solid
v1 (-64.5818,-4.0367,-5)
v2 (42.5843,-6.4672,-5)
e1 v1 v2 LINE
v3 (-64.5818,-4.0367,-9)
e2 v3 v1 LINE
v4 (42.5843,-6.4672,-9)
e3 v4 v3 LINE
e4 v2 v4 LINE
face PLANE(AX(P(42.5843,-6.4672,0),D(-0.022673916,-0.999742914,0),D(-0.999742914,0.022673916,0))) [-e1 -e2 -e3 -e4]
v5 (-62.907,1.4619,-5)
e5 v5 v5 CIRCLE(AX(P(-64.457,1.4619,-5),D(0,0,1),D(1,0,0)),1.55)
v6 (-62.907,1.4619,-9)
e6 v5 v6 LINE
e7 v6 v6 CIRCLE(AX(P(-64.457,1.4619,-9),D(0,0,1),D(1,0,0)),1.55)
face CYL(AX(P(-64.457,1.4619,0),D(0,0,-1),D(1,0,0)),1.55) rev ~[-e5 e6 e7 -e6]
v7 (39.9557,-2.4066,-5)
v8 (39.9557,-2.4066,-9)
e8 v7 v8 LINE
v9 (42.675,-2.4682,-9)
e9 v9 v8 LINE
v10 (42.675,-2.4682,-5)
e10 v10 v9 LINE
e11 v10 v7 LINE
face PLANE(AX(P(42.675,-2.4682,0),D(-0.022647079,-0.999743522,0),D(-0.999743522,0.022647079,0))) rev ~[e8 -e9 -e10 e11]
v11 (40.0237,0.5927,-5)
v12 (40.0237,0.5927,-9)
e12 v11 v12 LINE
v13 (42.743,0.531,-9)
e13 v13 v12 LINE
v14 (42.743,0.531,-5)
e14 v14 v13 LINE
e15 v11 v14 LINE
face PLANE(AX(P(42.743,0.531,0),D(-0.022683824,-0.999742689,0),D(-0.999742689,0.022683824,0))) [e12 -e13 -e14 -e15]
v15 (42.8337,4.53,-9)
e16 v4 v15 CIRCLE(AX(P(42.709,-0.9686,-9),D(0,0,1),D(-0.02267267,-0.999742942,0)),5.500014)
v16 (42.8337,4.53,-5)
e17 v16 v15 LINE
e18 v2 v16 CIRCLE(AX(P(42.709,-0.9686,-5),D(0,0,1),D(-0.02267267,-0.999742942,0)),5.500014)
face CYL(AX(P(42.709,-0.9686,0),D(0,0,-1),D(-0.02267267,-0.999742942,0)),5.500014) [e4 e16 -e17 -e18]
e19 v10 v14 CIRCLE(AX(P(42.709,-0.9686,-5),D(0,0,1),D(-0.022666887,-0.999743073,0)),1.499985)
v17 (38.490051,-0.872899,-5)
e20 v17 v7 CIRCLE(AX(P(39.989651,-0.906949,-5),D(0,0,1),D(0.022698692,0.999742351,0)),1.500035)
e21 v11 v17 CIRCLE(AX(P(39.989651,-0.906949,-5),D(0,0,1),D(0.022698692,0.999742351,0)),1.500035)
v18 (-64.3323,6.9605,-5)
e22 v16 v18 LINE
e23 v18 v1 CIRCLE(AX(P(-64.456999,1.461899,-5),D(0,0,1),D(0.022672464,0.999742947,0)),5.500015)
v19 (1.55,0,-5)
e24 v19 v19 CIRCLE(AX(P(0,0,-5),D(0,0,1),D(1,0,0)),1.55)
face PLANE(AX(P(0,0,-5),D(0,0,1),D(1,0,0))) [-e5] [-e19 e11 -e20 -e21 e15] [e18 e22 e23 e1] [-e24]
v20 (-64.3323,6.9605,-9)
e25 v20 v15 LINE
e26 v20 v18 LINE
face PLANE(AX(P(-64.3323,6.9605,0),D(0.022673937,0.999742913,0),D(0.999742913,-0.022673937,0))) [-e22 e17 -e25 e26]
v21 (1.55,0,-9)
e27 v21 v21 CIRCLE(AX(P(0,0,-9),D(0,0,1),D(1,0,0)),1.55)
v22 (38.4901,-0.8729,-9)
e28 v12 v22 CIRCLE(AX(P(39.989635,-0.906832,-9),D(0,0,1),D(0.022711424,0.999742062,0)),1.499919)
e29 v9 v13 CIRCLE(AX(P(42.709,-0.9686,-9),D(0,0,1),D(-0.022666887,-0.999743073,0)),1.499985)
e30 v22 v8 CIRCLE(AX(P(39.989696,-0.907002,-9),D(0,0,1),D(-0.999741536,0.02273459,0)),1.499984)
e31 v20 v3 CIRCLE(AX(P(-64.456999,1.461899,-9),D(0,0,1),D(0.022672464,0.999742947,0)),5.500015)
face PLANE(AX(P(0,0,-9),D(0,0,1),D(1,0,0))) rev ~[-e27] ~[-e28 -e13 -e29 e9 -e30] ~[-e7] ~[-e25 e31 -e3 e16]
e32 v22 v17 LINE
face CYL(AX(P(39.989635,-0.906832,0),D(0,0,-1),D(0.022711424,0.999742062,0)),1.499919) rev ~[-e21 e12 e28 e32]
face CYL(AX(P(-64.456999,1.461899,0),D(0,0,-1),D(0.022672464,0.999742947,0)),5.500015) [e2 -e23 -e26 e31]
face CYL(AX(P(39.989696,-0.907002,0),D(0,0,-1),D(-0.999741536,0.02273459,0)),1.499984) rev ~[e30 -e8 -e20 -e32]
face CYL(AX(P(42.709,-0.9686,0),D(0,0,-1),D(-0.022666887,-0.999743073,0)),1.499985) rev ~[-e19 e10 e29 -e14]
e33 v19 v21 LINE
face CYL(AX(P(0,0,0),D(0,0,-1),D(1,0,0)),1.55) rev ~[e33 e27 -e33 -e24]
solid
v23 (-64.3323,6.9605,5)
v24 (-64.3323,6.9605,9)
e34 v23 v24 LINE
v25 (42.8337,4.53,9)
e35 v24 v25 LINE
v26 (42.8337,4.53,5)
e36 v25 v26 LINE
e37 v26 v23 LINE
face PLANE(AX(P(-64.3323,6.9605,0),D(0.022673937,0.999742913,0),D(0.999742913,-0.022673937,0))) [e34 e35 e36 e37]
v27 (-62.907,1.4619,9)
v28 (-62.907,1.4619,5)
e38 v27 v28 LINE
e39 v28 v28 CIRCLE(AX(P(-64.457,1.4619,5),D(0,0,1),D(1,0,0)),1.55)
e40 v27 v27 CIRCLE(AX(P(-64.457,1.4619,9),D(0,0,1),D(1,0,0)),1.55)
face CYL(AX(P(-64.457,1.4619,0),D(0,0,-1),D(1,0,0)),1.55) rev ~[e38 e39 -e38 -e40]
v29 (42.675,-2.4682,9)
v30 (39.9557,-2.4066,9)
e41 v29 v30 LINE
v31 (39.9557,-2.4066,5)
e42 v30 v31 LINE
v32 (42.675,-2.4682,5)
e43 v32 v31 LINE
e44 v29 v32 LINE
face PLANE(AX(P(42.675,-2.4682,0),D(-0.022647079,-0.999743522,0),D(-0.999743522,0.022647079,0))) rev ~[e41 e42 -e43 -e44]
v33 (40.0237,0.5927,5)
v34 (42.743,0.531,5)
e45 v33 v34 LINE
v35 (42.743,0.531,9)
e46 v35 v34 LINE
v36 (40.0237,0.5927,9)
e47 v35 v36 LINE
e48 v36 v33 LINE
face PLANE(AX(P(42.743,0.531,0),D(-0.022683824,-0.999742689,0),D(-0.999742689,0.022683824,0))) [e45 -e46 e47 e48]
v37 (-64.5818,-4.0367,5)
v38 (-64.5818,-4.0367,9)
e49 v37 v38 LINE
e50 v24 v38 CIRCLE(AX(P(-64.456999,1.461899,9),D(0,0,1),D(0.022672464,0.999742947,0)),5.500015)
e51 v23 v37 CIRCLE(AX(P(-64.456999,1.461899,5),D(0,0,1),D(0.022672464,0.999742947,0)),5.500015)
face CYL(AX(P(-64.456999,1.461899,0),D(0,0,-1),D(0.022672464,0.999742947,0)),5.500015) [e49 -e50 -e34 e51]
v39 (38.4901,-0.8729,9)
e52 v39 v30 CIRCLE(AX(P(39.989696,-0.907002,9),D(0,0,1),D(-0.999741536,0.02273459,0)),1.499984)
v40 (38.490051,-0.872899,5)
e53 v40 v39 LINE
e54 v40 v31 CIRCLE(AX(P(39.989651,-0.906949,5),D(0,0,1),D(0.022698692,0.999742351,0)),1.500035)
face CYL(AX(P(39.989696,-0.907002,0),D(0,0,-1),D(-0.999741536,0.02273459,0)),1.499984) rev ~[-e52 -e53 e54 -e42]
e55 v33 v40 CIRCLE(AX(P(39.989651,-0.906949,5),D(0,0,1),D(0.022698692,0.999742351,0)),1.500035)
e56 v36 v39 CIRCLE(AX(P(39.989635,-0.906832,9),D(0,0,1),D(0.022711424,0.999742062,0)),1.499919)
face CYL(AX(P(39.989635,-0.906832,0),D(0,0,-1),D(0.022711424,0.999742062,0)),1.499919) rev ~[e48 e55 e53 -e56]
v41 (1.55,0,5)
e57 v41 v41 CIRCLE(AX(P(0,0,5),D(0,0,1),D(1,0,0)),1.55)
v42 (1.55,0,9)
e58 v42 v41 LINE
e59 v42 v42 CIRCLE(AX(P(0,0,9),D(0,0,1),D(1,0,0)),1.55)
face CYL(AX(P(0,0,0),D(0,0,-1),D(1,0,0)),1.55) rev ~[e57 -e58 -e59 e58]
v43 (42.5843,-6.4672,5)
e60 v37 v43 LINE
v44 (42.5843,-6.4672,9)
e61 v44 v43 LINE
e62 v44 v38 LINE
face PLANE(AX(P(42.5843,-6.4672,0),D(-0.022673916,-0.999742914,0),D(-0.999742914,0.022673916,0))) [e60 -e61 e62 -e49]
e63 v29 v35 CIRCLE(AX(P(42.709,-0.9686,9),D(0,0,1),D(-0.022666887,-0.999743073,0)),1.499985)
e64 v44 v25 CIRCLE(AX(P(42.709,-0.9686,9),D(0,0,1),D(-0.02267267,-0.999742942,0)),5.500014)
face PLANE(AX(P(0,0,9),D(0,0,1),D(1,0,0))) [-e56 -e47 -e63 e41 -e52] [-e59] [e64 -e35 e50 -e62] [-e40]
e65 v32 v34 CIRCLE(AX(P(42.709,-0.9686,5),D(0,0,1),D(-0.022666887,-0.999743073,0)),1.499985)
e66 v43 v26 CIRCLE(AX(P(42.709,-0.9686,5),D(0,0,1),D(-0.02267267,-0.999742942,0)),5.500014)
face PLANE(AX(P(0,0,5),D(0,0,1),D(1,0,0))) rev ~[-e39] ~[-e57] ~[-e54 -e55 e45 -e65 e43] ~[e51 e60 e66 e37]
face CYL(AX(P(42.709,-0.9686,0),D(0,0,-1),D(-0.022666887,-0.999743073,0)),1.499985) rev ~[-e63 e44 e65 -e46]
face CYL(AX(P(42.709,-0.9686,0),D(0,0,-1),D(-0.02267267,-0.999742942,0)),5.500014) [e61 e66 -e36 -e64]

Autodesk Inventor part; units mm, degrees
ref_plane "YZ Plane" through (0, 0, 0) normal (1, 0, 0) x (0, 1, 0)
ref_plane "XZ Plane" through (0, 0, 0) normal (0, 1, 0) x (-1, 0, 0)
ref_plane "XY Plane" through (0, 0, 0) normal (0, 0, 1) x (1, 0, 0)
sketch "Sketch1" plane through (0, 0, 0) normal (0, 0, 1) x (1, 0, 0)
  line L0 (0, 0) -> (-64.457, 1.4619) construction
  line L1 (0, 0) -> (42.709, -0.9686) construction
  line L2 (40.3298, 14.0892) -> (39.9897, -0.907) construction
  circle A0 centre (-64.457, 1.4619) radius 1.55
  arc A1 (-64.5818, -4.0367) -> (-64.3323, 6.9605) centre (-64.457, 1.4619) ccw construction
  arc A2 (42.743, 0.531) -> (42.675, -2.4682) centre (42.709, -0.9686) ccw construction
  arc A3 (38.4901, -0.8729) -> (39.9557, -2.4066) centre (39.9897, -0.907) ccw
  arc A4 (42.8337, 4.53) -> (42.5843, -6.4672) centre (42.709, -0.9686) ccw construction
  line L3 (-64.3323, 6.9605) -> (42.8337, 4.53)
  line L4 (42.5843, -6.4672) -> (-64.5818, -4.0367)
  line L5 (42.743, 0.531) -> (40.0237, 0.5927)
  line L6 (42.675, -2.4682) -> (39.9557, -2.4066)
  arc A5 (42.675, -2.4682) -> (42.743, 0.531) centre (42.709, -0.9686) ccw
  arc A6 (40.0237, 0.5927) -> (38.4901, -0.8729) centre (39.9897, -0.907) ccw
  arc A7 (39.9557, -2.4066) -> (40.0237, 0.5927) centre (39.9897, -0.907) ccw construction
  arc A8 (42.5843, -6.4672) -> (42.8337, 4.53) centre (42.709, -0.9686) ccw
  arc A9 (-64.3323, 6.9605) -> (-64.5818, -4.0367) centre (-64.457, 1.4619) ccw
  circle A10 centre (0, 0) radius 1.55
  dimension "d0" = 3
  dimension "d1" = 11
  dimension "d13" = 3.1
extrude "Extrusion1" add sketch "Sketch1" along normal mid plane 18
sketch "Sketch2" plane through (0, 0, 0) normal (0, 0, 1) x (1, 0, 0)
  arc A0 (42.675, -2.4682) -> (42.743, 0.531) centre (42.709, -0.9686) ccw projected
  line L0 (42.675, -2.4682) -> (39.9557, -2.4066) projected
  arc A1 (40.0237, 0.5927) -> (39.9557, -2.4066) centre (39.9897, -0.907) ccw projected
  line L1 (40.0237, 0.5927) -> (42.743, 0.531) projected
  circle A2 centre (0, 0) radius 1.55 projected
  circle A3 centre (-64.457, 1.4619) radius 1.55 projected
  line L2 (42.8337, 4.53) -> (-64.3323, 6.9605) projected
  arc A4 (-64.3323, 6.9605) -> (-64.5818, -4.0367) centre (-64.457, 1.4619) ccw projected
  line L3 (-64.5818, -4.0367) -> (42.5843, -6.4672) projected
  arc A5 (42.5843, -6.4672) -> (42.8337, 4.53) centre (42.709, -0.9686) ccw projected
extrude "Extrusion2" cut sketch "Sketch2" along normal mid plane 10
sketch "Sketch3" plane through (0, 0, 0) normal (0, 1, 0) x (-1, 0, 0)
  arc A0 (-43.8823, -9.7559) -> (-42.7176, -10.1422) centre (-40, 0) ccw
  line L0 (-40, 0) -> (0, 0) construction
  arc A1 (-43.8823, -14.4889) -> (-43.8823, 14.4889) centre (-40, 0) ccw construction
  line L1 (-40, 0) -> (-43.8823, -14.4889)
  line L2 (-40, 0) -> (-43.8823, 14.4889)
  line L3 (-43.8823, -14.4889) -> (-43.8823, 14.4889) construction
  arc A2 (-43.8823, 14.4889) -> (-43.8823, -14.4889) centre (-40, 0) ccw
  arc A3 (-43.8823, 9.7559) -> (-43.8823, -9.7559) centre (-40, 0) ccw
  arc A4 (-42.7176, -10.1422) -> (-42.7176, 10.1422) centre (-40, 0) ccw construction
  arc A5 (-42.7176, 10.1422) -> (-43.8823, 9.7559) centre (-40, 0) ccw
  dimension "d6" = 40
  dimension "d8" = 30
  dimension "d9" = 10.5
  dimension "d10" = 150
extrude "Extrusion3" [suppressed]
properties part number "biela-dedo-3"
